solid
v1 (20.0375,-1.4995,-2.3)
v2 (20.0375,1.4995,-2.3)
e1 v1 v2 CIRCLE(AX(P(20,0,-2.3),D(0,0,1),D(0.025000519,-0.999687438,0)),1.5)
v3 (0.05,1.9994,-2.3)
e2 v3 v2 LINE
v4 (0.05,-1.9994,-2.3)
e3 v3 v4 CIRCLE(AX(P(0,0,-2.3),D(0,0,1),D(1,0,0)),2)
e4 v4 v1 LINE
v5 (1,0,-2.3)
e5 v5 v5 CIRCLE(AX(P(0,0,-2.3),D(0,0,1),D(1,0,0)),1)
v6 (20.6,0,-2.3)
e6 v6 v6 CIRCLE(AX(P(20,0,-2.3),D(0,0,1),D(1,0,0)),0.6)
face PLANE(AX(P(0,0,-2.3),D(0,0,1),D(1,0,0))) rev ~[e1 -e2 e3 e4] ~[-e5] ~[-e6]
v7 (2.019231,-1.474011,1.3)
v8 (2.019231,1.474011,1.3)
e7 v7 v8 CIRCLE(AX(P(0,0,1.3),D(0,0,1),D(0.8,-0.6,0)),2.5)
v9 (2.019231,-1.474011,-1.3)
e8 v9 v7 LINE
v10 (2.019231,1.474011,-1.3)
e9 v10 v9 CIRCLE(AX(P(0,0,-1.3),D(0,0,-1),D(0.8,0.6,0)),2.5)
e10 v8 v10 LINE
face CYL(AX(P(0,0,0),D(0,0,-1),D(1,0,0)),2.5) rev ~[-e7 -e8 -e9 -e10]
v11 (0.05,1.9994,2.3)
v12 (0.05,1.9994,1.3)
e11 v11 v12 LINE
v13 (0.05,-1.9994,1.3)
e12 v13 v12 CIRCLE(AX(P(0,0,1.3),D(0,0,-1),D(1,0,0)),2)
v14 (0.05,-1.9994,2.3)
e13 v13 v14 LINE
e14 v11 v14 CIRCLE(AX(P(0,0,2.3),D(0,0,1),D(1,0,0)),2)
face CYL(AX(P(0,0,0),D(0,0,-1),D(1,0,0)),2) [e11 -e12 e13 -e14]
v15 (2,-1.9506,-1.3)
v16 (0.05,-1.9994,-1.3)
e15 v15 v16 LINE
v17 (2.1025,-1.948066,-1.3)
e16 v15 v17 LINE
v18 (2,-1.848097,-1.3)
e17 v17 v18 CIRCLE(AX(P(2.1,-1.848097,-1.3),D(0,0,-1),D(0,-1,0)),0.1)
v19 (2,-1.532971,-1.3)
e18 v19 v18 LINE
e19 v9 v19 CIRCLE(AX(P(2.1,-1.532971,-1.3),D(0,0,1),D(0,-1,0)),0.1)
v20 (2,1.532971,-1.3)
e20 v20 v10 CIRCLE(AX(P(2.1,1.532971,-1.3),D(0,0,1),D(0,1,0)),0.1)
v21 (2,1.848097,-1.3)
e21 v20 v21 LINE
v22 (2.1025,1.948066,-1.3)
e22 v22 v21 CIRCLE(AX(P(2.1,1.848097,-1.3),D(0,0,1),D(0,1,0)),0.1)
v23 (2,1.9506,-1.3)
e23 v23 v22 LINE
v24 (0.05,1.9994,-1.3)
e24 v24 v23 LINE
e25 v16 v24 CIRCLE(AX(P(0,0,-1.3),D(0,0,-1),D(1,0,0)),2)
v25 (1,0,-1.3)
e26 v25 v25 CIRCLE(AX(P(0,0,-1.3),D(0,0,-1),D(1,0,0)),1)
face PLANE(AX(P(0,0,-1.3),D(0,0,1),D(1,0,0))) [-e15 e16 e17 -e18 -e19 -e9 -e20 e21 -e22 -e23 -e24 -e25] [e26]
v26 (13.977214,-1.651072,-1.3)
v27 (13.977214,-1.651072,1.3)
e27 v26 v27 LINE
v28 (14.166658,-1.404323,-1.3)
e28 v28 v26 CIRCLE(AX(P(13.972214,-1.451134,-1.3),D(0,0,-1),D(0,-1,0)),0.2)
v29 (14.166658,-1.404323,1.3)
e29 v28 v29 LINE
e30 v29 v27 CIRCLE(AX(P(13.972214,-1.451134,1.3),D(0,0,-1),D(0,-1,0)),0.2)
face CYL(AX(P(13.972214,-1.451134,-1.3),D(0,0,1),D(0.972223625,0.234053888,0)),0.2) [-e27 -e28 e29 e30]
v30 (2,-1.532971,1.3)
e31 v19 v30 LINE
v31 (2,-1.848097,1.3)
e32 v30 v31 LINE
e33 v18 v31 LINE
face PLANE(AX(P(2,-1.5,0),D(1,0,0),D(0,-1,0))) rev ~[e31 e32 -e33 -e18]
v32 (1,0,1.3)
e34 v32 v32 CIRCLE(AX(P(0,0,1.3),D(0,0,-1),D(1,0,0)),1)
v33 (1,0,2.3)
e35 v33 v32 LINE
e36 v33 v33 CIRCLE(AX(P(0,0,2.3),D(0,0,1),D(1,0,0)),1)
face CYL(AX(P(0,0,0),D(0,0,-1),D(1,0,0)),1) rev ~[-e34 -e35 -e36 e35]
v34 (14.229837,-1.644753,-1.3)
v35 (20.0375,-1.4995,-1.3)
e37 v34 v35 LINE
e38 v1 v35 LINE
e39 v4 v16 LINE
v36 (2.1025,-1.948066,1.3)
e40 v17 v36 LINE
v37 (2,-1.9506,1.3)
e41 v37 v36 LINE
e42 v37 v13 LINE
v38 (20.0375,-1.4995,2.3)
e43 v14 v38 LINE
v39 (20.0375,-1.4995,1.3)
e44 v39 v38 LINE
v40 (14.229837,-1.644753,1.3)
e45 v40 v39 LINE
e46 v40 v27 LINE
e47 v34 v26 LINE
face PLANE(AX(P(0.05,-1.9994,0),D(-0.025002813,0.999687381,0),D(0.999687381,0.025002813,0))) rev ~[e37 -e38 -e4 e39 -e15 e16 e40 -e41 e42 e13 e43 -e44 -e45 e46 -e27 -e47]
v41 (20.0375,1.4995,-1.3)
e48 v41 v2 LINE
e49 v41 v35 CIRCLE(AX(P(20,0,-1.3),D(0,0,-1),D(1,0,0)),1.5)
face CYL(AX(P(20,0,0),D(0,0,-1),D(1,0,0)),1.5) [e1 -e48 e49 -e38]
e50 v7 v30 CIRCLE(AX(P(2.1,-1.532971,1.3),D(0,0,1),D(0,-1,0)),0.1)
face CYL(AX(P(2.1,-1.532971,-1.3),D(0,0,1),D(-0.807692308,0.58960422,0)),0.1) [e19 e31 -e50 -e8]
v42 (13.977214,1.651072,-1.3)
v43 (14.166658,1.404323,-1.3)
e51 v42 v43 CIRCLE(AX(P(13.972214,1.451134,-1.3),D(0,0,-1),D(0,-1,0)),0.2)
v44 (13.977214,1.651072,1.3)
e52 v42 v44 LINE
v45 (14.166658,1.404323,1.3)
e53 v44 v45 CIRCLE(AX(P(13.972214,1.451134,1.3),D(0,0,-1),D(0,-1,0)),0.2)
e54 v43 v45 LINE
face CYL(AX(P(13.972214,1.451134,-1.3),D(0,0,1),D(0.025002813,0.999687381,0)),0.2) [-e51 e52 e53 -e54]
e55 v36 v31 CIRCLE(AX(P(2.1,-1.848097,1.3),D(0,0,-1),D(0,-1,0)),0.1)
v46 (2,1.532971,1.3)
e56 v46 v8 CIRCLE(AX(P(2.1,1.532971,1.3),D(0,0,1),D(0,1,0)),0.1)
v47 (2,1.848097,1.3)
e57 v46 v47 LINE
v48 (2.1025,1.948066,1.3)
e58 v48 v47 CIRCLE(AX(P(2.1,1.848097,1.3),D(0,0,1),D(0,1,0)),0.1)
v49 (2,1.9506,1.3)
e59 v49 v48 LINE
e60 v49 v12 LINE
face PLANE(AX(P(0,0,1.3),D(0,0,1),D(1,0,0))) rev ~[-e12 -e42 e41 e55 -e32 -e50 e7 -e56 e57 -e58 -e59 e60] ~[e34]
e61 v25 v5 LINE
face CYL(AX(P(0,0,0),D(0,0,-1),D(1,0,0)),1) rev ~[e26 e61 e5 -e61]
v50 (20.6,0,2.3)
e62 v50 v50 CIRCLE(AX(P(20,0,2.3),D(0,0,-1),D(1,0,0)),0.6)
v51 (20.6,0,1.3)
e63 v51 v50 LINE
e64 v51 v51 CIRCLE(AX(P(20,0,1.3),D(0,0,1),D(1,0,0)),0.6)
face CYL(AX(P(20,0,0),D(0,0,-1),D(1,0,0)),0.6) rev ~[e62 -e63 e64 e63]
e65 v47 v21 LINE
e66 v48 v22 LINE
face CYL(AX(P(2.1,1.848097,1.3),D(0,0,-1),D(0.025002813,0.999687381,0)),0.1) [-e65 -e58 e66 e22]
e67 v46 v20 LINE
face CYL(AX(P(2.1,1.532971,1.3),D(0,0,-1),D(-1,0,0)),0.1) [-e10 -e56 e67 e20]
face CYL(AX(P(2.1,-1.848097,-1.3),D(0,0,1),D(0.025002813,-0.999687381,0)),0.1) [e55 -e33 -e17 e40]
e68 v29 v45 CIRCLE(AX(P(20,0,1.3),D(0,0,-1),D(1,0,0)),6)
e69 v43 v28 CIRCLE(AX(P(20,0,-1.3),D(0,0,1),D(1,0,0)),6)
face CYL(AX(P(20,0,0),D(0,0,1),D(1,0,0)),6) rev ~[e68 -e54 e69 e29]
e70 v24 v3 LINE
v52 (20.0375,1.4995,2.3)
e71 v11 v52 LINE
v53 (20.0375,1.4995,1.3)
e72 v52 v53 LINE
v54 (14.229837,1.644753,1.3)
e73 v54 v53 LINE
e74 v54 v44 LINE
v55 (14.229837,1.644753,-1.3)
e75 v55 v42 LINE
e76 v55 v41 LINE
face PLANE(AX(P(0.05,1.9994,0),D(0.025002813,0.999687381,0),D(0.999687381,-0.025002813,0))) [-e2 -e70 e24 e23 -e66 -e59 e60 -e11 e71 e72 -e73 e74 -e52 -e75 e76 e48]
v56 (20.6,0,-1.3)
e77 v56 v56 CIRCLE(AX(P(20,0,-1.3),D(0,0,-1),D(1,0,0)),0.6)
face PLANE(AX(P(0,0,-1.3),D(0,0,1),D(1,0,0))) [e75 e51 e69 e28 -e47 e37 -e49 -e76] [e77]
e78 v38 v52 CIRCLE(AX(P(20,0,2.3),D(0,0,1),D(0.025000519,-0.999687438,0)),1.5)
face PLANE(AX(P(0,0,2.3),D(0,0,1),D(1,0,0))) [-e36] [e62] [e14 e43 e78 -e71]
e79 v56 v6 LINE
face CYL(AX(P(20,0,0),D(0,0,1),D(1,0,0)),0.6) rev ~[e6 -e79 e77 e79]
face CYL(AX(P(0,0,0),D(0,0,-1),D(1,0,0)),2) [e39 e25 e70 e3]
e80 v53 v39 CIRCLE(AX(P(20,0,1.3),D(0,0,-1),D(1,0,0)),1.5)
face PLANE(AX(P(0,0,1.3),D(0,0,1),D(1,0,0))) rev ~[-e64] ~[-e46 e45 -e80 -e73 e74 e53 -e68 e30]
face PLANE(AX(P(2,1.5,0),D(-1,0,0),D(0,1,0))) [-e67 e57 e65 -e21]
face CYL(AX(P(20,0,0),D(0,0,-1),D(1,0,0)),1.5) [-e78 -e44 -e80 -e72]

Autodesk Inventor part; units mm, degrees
ref_plane "YZ Plane" through (0, 0, 0) normal (1, 0, 0) x (0, 1, 0)
ref_plane "XZ Plane" through (0, 0, 0) normal (0, 1, 0) x (-1, 0, 0)
ref_plane "XY Plane" through (0, 0, 0) normal (0, 0, 1) x (1, 0, 0)
sketch "Sketch1" plane through (0, 0, 0) normal (0, 0, 1) x (1, 0, 0)
  circle A0 centre (0, 0) radius 2
  circle A1 centre (0, 0) radius 1
  line L0 (0, 0) -> (20, 0)
  circle A2 centre (20, 0) radius 1.5
  circle A3 centre (20, 0) radius 0.6
  line L1 (0.05, 1.9994) -> (20.0375, 1.4995)
  line L2 (0.05, -1.9994) -> (20.0375, -1.4995)
  dimension "d0" = 4
  dimension "d1" = 2
  dimension "d2" = 20
  dimension "d3" = 3
  dimension "d4" = 1.2
extrude "Extrusion1" add sketch "Sketch1" along normal mid plane 4.6
sketch "Sketch2" plane through (0, 0, 0) normal (0, 0, 1) x (1, 0, 0)
  line L0 (0, 0) -> (2, 0)
  line L1 (2, 0) -> (2, 1.9506)
  line L2 (20.0375, 1.4995) -> (0.05, 1.9994) projected
  line L3 (2, 0) -> (2, -1.9506)
  line L4 (0.05, -1.9994) -> (20.0375, -1.4995) projected
  circle A0 centre (0, 0) radius 2.5
  circle A1 centre (20, 0) radius 0.6 projected
  circle A2 centre (20, 0) radius 6
  point P0 (2, -1.5)
  point P1 (2, 1.5)
  point P2 (1.5495, 1.9619)
  point P3 (1.5495, -1.9619)
  dimension "d7" = 2
  dimension "d8" = 5
  dimension "d10" = 12
extrude "Extrusion2" cut sketch "Sketch2" along normal mid plane 2.6 contours L3 A0 L1 | L1 A0 L3 | A0 L2 L1 | L3 L4 A0 | A2
fillet "Fillet1" radius 0.1 4 edges at (2, 1.5, 0) (2, -1.5, 0) (2, 1.9506, 0) (2, -1.9506, 0)
fillet "Fillet2" radius 0.2 2 edges at (14.2298, 1.6448, 0) (14.2298, -1.6448, 0)
properties part number "New_ThinArm_second"
